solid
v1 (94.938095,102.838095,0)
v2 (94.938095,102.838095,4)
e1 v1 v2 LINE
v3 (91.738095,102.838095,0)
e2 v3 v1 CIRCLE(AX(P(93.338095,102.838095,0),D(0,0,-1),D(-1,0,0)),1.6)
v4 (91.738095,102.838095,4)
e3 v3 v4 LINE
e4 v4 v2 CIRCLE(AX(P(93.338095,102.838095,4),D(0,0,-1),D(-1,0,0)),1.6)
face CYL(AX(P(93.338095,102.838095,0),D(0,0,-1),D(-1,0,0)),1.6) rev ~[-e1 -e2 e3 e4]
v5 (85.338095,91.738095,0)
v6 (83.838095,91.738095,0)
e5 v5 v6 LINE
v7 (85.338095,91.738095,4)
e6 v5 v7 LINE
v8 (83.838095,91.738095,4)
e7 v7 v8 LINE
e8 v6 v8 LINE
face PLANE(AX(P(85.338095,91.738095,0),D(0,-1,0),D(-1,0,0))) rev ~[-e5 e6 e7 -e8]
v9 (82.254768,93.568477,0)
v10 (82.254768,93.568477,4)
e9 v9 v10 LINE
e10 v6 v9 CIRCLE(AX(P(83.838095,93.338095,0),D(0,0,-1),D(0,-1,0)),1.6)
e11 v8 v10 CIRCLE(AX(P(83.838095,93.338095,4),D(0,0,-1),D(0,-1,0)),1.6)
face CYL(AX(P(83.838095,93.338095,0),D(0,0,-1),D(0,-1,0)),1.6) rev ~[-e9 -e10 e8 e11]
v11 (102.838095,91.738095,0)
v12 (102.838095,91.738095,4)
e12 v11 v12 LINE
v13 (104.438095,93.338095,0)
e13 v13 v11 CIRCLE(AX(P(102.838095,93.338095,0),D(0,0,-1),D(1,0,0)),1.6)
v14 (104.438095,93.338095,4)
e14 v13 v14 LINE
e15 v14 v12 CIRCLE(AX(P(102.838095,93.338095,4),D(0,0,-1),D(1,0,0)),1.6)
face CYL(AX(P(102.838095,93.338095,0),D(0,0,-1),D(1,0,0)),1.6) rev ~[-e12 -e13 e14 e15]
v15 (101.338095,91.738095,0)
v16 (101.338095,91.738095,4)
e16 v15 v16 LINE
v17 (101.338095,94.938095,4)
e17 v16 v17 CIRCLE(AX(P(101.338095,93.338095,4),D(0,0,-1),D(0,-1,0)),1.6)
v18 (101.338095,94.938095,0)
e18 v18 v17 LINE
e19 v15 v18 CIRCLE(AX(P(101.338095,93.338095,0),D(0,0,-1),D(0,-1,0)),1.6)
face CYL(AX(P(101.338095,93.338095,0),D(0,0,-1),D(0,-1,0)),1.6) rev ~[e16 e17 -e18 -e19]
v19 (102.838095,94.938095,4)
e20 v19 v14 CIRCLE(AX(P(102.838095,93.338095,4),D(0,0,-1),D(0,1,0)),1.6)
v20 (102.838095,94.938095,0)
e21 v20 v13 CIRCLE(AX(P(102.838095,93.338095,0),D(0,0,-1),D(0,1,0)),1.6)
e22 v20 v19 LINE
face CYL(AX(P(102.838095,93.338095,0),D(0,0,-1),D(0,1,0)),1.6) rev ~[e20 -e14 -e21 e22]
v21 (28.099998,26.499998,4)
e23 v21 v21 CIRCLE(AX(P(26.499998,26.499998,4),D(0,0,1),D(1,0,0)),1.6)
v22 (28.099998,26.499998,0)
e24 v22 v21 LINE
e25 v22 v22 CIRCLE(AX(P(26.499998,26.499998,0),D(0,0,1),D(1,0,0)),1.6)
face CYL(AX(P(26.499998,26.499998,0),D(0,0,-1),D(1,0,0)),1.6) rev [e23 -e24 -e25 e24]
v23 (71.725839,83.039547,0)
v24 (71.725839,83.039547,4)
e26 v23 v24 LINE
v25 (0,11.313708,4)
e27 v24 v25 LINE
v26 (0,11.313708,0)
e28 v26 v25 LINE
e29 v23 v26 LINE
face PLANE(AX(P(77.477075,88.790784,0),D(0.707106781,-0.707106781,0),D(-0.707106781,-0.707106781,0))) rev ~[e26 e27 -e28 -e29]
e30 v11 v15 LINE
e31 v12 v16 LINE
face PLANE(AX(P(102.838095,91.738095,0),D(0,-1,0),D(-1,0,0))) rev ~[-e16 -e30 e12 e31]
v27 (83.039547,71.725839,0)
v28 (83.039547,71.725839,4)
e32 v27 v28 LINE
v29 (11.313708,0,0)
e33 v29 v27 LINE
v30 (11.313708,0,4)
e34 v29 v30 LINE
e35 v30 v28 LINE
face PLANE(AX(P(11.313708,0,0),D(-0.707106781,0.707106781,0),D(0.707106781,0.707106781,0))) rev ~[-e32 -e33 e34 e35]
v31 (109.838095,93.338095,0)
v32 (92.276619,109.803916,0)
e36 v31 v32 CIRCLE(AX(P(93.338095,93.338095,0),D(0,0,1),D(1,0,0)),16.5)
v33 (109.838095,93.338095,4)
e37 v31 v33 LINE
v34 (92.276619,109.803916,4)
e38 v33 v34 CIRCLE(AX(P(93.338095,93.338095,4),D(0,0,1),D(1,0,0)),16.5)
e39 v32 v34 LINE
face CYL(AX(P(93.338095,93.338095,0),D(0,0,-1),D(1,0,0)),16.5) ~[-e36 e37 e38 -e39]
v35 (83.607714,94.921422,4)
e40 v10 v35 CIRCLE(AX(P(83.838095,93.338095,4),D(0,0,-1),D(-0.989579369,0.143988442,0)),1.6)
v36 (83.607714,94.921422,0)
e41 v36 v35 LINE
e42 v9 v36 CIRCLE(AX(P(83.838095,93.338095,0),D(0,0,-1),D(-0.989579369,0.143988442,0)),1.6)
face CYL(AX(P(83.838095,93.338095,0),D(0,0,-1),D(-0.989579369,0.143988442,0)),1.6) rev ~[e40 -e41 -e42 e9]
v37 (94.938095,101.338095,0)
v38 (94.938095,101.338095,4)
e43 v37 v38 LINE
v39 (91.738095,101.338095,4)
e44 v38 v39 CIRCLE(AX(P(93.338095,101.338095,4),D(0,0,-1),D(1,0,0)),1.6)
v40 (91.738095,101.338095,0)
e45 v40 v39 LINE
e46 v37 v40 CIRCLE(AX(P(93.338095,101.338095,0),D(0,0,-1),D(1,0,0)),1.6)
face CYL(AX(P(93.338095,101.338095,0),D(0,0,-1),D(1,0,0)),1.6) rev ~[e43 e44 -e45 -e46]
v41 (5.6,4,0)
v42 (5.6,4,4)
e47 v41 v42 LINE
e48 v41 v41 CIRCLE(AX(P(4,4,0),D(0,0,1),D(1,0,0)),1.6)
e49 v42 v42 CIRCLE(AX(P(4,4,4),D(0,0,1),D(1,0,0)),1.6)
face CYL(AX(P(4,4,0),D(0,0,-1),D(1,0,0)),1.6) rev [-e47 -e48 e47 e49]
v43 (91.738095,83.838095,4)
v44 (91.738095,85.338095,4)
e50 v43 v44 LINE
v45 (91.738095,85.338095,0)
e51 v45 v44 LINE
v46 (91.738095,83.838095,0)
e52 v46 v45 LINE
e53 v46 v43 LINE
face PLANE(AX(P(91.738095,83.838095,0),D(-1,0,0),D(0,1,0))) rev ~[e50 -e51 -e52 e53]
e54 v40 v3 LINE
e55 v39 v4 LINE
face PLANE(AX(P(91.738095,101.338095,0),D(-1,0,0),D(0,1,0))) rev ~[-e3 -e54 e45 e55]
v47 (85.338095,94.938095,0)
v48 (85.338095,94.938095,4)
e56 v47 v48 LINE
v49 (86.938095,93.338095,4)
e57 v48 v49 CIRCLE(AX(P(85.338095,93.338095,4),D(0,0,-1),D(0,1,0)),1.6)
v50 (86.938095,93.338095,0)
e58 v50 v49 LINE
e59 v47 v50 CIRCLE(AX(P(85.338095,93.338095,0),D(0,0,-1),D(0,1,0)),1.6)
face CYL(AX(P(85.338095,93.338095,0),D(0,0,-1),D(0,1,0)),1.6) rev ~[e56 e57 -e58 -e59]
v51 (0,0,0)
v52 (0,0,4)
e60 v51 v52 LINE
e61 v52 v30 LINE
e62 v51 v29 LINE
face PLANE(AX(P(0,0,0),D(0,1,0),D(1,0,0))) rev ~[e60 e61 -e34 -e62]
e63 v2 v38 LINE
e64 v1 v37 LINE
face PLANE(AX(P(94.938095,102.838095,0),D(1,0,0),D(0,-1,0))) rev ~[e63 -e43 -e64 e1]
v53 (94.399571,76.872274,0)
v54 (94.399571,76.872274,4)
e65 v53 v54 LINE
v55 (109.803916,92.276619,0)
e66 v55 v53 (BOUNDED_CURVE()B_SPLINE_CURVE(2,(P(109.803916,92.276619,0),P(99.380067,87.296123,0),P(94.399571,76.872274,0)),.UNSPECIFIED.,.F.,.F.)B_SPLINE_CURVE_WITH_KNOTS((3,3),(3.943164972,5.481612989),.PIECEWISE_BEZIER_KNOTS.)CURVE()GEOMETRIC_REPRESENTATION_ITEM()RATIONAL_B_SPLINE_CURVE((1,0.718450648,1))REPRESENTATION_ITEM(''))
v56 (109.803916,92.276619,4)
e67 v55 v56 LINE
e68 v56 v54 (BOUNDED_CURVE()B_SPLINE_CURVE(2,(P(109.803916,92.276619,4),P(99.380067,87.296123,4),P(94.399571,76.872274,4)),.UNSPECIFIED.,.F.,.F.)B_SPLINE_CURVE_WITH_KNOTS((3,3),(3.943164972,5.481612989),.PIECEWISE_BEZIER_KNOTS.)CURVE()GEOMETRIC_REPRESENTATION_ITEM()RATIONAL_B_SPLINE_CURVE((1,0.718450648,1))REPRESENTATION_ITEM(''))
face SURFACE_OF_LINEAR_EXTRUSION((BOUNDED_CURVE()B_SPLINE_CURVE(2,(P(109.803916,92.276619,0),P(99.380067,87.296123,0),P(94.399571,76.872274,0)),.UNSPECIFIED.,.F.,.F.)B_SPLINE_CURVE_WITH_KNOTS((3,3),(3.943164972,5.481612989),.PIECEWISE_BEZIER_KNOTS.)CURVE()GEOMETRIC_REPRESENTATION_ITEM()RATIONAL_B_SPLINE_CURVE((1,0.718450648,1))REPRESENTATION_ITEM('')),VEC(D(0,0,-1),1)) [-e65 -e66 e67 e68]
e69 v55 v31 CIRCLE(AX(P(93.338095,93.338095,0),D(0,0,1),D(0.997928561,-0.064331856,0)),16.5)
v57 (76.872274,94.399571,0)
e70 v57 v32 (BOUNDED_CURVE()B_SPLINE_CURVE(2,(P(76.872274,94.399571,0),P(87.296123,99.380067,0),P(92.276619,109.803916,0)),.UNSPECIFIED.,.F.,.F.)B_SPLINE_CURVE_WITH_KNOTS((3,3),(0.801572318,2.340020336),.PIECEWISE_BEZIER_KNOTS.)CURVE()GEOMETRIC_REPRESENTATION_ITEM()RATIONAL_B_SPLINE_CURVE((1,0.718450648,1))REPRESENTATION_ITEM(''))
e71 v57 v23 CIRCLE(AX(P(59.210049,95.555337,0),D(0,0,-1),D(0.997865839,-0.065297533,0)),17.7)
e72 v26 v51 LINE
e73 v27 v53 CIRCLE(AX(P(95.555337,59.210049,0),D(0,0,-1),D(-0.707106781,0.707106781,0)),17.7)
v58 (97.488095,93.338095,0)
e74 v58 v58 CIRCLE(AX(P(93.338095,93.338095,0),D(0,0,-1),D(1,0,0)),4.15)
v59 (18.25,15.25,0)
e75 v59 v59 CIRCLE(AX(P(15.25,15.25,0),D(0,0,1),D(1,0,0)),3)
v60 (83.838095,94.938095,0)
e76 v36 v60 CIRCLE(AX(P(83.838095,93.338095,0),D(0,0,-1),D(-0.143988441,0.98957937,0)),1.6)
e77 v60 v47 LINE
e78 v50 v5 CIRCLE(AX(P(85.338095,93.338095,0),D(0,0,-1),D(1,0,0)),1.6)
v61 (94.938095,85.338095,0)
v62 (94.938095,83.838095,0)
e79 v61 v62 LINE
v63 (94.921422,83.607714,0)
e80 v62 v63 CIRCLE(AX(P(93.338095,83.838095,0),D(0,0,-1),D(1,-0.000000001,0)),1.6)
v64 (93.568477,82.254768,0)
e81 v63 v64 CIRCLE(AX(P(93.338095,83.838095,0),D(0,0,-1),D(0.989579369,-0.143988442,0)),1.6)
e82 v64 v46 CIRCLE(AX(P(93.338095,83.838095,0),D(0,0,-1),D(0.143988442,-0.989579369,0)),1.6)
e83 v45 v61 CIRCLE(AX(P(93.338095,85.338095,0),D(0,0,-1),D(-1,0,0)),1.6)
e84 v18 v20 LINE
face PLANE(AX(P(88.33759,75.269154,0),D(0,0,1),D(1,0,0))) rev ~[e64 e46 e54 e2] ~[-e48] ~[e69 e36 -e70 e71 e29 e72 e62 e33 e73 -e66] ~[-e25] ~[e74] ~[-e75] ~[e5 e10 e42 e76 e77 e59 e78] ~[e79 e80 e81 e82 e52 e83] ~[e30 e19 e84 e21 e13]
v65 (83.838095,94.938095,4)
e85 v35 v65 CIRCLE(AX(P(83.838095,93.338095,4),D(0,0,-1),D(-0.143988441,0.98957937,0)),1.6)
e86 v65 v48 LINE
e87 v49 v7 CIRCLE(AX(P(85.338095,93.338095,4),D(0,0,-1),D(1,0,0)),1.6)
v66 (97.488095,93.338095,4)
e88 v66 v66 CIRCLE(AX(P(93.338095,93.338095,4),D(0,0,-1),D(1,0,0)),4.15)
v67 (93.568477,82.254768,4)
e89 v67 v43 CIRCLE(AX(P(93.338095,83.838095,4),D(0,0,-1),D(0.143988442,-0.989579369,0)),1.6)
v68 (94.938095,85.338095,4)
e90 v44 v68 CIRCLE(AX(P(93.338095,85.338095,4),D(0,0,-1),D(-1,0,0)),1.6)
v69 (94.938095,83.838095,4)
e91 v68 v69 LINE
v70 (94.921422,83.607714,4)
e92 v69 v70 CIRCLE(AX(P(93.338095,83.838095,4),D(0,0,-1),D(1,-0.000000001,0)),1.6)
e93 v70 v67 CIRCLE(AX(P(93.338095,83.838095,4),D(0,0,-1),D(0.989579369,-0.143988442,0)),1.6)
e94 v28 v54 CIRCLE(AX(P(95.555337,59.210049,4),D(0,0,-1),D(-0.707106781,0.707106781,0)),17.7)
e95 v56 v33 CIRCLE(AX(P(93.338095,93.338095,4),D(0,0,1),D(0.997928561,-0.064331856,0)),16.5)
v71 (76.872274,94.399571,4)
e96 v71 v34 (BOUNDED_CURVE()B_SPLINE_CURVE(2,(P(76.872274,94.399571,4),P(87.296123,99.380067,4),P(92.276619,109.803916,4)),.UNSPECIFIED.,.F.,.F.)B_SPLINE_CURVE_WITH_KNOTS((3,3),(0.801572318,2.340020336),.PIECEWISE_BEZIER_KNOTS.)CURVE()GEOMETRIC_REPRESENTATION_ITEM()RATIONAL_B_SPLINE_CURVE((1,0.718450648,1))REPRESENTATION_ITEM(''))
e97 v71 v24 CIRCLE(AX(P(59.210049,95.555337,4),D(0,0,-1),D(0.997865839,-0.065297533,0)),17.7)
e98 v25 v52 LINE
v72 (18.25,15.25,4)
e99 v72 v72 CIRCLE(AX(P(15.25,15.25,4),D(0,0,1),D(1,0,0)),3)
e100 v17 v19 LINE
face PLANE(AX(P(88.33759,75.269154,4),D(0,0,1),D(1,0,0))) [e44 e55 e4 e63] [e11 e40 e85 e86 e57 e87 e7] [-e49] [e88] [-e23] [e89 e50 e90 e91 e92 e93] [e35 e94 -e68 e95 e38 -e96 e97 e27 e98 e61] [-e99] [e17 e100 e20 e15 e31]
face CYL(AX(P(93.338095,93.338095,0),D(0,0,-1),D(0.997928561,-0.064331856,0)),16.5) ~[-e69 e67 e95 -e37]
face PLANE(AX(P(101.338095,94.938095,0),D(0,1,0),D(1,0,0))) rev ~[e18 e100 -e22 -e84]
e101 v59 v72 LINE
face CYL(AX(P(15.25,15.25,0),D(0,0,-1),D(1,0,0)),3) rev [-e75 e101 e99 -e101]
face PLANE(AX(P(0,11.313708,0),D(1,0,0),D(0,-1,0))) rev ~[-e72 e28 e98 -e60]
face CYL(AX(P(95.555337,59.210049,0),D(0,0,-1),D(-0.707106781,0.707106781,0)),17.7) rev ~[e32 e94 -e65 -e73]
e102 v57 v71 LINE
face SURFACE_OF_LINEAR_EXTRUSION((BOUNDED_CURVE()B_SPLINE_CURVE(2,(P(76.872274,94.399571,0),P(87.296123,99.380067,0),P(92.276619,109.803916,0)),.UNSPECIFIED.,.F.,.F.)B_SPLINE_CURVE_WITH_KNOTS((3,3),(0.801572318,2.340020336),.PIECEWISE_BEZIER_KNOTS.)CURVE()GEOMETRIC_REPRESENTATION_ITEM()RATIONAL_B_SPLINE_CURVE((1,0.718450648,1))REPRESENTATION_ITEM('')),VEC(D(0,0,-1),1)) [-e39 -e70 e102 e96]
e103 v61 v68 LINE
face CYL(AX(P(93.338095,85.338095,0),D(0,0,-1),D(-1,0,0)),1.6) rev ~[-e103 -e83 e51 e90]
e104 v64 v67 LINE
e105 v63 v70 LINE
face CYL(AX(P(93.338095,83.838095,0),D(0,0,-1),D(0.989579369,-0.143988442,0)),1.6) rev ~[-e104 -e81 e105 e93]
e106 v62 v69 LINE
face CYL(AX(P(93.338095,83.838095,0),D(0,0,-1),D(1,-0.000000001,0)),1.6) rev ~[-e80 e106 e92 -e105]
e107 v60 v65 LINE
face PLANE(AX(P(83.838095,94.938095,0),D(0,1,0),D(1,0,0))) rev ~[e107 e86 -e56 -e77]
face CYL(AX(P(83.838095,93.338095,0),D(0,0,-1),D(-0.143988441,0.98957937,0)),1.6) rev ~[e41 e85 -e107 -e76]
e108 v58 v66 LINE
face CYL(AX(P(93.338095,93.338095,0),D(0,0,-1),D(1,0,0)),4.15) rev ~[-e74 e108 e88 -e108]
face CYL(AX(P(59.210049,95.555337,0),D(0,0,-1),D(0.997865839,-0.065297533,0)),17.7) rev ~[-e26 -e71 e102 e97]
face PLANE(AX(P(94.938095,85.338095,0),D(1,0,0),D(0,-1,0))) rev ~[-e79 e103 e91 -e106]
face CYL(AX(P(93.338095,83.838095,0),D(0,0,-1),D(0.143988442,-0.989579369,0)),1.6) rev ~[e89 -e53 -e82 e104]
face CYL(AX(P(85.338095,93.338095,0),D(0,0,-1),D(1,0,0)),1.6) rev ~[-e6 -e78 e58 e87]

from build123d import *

# Parameters (mm, degrees)
F0_R        = 1.6
F0_R_2      = 3
F1_DEPTH    = 4
F2_T1_DEPTH = 4


# Not quite as in the source:
# - a fillet or chamfer that OpenCascade refuses, or shapes differently, is made with other operations: its cross-section is extruded or revolved along the edge and cut away or added


with BuildPart() as f1:
    # F0 (on Top) → F1 (new body)
    with BuildSketch(Plane.XY):
        with BuildLine():
            ThreePointArc((88.7907835501, 77.4770750512), (81.670833227, 81.670833227), (77.4770750512, 88.7907835501))
            Line((77.4770750512, 88.7907835501), (0, 11.313708499))
            Line((0, 11.313708499), (0, 0))
            Line((0, 0), (11.313708499, 0))
            Line((11.313708499, 0), (88.7907835501, 77.4770750512))
        make_face()
        with Locations((4, 4)):
            Circle(F0_R, mode=Mode.SUBTRACT)
        with Locations((15.25, 15.25)):
            Circle(F0_R_2, mode=Mode.SUBTRACT)
        with Locations((26.499998178, 26.499998178)):
            Circle(F0_R, mode=Mode.SUBTRACT)
        with BuildLine():
            ThreePointArc((96.2725882585, 90.4036019747), (90.4036019747, 90.4036019747), (90.4036019747, 96.2725882585))
            Line((90.4036019747, 96.2725882585), (87.6812408671, 98.9949493661))
            Line((87.6812408671, 98.9949493661), (83.6077136088, 94.9214221078))
            ThreePointArc((83.6077136088, 94.9214221078), (83.7226030948, 94.9339214207), (83.8380951166, 94.9380951166))
            Line((83.8380951166, 94.9380951166), (85.3380951166, 94.9380951166))
            ThreePointArc((85.3380951166, 94.9380951166), (86.4694659665, 94.4694659665), (86.9380951166, 93.3380951166))
            ThreePointArc((86.9380951166, 93.3380951166), (86.4694659665, 92.2067242667), (85.3380951166, 91.7380951166))
            Line((85.3380951166, 91.7380951166), (83.8380951166, 91.7380951166))
            ThreePointArc((83.8380951166, 91.7380951166), (82.6280103236, 92.2913407072), (82.2547681255, 93.5684766245))
            Line((82.2547681255, 93.5684766245), (77.4770750512, 88.7907835501))
            ThreePointArc((77.4770750512, 88.7907835501), (81.670833227, 81.670833227), (88.7907835501, 77.4770750512))
            Line((88.7907835501, 77.4770750512), (93.5684766245, 82.2547681255))
            ThreePointArc((93.5684766245, 82.2547681255), (92.2913407072, 82.6280103236), (91.7380951166, 83.8380951166))
            Line((91.7380951166, 83.8380951166), (91.7380951166, 85.3380951166))
            ThreePointArc((91.7380951166, 85.3380951166), (93.3380951166, 86.9380951166), (94.9380951166, 85.3380951166))
            Line((94.9380951166, 85.3380951166), (94.9380951166, 83.8380951166))
            ThreePointArc((94.9380951166, 83.8380951166), (94.9339214207, 83.7226030948), (94.9214221078, 83.6077136088))
            Line((94.9214221078, 83.6077136088), (98.9949493661, 87.6812408671))
            Line((98.9949493661, 87.6812408671), (96.2725882585, 90.4036019747))
        make_face()
        with BuildLine():
            Line((87.6812408671, 98.9949493661), (90.4036019747, 96.2725882585))
            ThreePointArc((90.4036019747, 96.2725882585), (94.9262313609, 97.1721951765), (97.4880951166, 93.3380951166))
            ThreePointArc((97.4880951166, 93.3380951166), (97.1721951765, 91.7499588723), (96.2725882585, 90.4036019747))
            Line((96.2725882585, 90.4036019747), (98.9949493661, 87.6812408671))
            Line((98.9949493661, 87.6812408671), (94.9214221078, 83.6077136088))
            ThreePointArc((94.9214221078, 83.6077136088), (94.4694659665, 82.7067242667), (93.5684766245, 82.2547681255))
            Line((93.5684766245, 82.2547681255), (88.7907835501, 77.4770750512))
            ThreePointArc((88.7907835501, 77.4770750512), (91.5691380282, 76.9331936899), (94.3995707365, 76.8722738645))
            add(Edge.make_bspline(
                [(109.8039163688, 92.2766194967), (99.380066986, 87.2961232472), (94.3995707365, 76.8722738645)],
                knots=[3.9431649716, 3.9431649716, 3.9431649716, 5.4816129892, 5.4816129892, 5.4816129892], degree=2, weights=[1, 0.7184506482, 1]))
            ThreePointArc((109.8039163688, 92.2766194968), (109.829548216, 92.8070822452), (109.8380951166, 93.3380951166))
            ThreePointArc((109.8380951166, 93.3380951166), (104.6238306326, 105.3747962371), (92.2766194968, 109.8039163688))
            add(Edge.make_bspline(
                [(76.8722738645, 94.3995707365), (87.2961232472, 99.380066986), (92.2766194967, 109.8039163688)],
                knots=[0.801572318, 0.801572318, 0.801572318, 2.3400203356, 2.3400203356, 2.3400203356], degree=2, weights=[1, 0.7184506482, 1]))
            ThreePointArc((76.8722738645, 94.3995707365), (76.9331936899, 91.5691380282), (77.4770750512, 88.7907835501))
            Line((77.4770750512, 88.7907835501), (82.2547681255, 93.5684766245))
            ThreePointArc((82.2547681255, 93.5684766245), (82.7067242667, 94.4694659665), (83.6077136088, 94.9214221078))
            Line((83.6077136088, 94.9214221078), (87.6812408671, 98.9949493661))
        make_face()
        with BuildLine():
            ThreePointArc((104.4380951166, 93.3380951166), (103.9694659665, 92.2067242667), (102.8380951166, 91.7380951166))
            Line((102.8380951166, 91.7380951166), (101.3380951166, 91.7380951166))
            ThreePointArc((101.3380951166, 91.7380951166), (99.7380951166, 93.3380951166), (101.3380951166, 94.9380951166))
            Line((101.3380951166, 94.9380951166), (102.8380951166, 94.9380951166))
            ThreePointArc((102.8380951166, 94.9380951166), (103.9694659665, 94.4694659665), (104.4380951166, 93.3380951166))
        make_face(mode=Mode.SUBTRACT)
        with BuildLine():
            Line((91.7380951166, 101.3380951166), (91.7380951166, 102.8380951166))
            ThreePointArc((91.7380951166, 102.8380951166), (93.3380951166, 104.4380951166), (94.9380951166, 102.8380951166))
            Line((94.9380951166, 102.8380951166), (94.9380951166, 101.3380951166))
            ThreePointArc((94.9380951166, 101.3380951166), (93.3380951166, 99.7380951166), (91.7380951166, 101.3380951166))
        make_face(mode=Mode.SUBTRACT)
    extrude(amount=F1_DEPTH)

    # F2: fillet of radius 17.7 on 2 edges, made by hand

    # F2_s2 → F2_t1 (join)
    with BuildSketch(Plane.XY):
        with BuildLine():
            ThreePointArc((83.0395470443, 71.7258385453), (88.2512757036, 75.3327247086), (94.3995707365, 76.8722738645))
            ThreePointArc((94.3995707365, 76.8722738645), (91.5691380282, 76.9331936899), (88.7907835501, 77.4770750512))
            Line((88.7907835501, 77.4770750512), (83.0395470443, 71.7258385453))
        make_face()
        with BuildLine():
            ThreePointArc((76.8722738645, 94.3995707365), (75.3327247086, 88.2512757036), (71.7258385453, 83.0395470443))
            Line((71.7258385453, 83.0395470443), (77.4770750512, 88.7907835501))
            ThreePointArc((77.4770750512, 88.7907835501), (76.9331936899, 91.5691380282), (76.8722738645, 94.3995707365))
        make_face()
    extrude(amount=F2_T1_DEPTH)


solid = f1.part
